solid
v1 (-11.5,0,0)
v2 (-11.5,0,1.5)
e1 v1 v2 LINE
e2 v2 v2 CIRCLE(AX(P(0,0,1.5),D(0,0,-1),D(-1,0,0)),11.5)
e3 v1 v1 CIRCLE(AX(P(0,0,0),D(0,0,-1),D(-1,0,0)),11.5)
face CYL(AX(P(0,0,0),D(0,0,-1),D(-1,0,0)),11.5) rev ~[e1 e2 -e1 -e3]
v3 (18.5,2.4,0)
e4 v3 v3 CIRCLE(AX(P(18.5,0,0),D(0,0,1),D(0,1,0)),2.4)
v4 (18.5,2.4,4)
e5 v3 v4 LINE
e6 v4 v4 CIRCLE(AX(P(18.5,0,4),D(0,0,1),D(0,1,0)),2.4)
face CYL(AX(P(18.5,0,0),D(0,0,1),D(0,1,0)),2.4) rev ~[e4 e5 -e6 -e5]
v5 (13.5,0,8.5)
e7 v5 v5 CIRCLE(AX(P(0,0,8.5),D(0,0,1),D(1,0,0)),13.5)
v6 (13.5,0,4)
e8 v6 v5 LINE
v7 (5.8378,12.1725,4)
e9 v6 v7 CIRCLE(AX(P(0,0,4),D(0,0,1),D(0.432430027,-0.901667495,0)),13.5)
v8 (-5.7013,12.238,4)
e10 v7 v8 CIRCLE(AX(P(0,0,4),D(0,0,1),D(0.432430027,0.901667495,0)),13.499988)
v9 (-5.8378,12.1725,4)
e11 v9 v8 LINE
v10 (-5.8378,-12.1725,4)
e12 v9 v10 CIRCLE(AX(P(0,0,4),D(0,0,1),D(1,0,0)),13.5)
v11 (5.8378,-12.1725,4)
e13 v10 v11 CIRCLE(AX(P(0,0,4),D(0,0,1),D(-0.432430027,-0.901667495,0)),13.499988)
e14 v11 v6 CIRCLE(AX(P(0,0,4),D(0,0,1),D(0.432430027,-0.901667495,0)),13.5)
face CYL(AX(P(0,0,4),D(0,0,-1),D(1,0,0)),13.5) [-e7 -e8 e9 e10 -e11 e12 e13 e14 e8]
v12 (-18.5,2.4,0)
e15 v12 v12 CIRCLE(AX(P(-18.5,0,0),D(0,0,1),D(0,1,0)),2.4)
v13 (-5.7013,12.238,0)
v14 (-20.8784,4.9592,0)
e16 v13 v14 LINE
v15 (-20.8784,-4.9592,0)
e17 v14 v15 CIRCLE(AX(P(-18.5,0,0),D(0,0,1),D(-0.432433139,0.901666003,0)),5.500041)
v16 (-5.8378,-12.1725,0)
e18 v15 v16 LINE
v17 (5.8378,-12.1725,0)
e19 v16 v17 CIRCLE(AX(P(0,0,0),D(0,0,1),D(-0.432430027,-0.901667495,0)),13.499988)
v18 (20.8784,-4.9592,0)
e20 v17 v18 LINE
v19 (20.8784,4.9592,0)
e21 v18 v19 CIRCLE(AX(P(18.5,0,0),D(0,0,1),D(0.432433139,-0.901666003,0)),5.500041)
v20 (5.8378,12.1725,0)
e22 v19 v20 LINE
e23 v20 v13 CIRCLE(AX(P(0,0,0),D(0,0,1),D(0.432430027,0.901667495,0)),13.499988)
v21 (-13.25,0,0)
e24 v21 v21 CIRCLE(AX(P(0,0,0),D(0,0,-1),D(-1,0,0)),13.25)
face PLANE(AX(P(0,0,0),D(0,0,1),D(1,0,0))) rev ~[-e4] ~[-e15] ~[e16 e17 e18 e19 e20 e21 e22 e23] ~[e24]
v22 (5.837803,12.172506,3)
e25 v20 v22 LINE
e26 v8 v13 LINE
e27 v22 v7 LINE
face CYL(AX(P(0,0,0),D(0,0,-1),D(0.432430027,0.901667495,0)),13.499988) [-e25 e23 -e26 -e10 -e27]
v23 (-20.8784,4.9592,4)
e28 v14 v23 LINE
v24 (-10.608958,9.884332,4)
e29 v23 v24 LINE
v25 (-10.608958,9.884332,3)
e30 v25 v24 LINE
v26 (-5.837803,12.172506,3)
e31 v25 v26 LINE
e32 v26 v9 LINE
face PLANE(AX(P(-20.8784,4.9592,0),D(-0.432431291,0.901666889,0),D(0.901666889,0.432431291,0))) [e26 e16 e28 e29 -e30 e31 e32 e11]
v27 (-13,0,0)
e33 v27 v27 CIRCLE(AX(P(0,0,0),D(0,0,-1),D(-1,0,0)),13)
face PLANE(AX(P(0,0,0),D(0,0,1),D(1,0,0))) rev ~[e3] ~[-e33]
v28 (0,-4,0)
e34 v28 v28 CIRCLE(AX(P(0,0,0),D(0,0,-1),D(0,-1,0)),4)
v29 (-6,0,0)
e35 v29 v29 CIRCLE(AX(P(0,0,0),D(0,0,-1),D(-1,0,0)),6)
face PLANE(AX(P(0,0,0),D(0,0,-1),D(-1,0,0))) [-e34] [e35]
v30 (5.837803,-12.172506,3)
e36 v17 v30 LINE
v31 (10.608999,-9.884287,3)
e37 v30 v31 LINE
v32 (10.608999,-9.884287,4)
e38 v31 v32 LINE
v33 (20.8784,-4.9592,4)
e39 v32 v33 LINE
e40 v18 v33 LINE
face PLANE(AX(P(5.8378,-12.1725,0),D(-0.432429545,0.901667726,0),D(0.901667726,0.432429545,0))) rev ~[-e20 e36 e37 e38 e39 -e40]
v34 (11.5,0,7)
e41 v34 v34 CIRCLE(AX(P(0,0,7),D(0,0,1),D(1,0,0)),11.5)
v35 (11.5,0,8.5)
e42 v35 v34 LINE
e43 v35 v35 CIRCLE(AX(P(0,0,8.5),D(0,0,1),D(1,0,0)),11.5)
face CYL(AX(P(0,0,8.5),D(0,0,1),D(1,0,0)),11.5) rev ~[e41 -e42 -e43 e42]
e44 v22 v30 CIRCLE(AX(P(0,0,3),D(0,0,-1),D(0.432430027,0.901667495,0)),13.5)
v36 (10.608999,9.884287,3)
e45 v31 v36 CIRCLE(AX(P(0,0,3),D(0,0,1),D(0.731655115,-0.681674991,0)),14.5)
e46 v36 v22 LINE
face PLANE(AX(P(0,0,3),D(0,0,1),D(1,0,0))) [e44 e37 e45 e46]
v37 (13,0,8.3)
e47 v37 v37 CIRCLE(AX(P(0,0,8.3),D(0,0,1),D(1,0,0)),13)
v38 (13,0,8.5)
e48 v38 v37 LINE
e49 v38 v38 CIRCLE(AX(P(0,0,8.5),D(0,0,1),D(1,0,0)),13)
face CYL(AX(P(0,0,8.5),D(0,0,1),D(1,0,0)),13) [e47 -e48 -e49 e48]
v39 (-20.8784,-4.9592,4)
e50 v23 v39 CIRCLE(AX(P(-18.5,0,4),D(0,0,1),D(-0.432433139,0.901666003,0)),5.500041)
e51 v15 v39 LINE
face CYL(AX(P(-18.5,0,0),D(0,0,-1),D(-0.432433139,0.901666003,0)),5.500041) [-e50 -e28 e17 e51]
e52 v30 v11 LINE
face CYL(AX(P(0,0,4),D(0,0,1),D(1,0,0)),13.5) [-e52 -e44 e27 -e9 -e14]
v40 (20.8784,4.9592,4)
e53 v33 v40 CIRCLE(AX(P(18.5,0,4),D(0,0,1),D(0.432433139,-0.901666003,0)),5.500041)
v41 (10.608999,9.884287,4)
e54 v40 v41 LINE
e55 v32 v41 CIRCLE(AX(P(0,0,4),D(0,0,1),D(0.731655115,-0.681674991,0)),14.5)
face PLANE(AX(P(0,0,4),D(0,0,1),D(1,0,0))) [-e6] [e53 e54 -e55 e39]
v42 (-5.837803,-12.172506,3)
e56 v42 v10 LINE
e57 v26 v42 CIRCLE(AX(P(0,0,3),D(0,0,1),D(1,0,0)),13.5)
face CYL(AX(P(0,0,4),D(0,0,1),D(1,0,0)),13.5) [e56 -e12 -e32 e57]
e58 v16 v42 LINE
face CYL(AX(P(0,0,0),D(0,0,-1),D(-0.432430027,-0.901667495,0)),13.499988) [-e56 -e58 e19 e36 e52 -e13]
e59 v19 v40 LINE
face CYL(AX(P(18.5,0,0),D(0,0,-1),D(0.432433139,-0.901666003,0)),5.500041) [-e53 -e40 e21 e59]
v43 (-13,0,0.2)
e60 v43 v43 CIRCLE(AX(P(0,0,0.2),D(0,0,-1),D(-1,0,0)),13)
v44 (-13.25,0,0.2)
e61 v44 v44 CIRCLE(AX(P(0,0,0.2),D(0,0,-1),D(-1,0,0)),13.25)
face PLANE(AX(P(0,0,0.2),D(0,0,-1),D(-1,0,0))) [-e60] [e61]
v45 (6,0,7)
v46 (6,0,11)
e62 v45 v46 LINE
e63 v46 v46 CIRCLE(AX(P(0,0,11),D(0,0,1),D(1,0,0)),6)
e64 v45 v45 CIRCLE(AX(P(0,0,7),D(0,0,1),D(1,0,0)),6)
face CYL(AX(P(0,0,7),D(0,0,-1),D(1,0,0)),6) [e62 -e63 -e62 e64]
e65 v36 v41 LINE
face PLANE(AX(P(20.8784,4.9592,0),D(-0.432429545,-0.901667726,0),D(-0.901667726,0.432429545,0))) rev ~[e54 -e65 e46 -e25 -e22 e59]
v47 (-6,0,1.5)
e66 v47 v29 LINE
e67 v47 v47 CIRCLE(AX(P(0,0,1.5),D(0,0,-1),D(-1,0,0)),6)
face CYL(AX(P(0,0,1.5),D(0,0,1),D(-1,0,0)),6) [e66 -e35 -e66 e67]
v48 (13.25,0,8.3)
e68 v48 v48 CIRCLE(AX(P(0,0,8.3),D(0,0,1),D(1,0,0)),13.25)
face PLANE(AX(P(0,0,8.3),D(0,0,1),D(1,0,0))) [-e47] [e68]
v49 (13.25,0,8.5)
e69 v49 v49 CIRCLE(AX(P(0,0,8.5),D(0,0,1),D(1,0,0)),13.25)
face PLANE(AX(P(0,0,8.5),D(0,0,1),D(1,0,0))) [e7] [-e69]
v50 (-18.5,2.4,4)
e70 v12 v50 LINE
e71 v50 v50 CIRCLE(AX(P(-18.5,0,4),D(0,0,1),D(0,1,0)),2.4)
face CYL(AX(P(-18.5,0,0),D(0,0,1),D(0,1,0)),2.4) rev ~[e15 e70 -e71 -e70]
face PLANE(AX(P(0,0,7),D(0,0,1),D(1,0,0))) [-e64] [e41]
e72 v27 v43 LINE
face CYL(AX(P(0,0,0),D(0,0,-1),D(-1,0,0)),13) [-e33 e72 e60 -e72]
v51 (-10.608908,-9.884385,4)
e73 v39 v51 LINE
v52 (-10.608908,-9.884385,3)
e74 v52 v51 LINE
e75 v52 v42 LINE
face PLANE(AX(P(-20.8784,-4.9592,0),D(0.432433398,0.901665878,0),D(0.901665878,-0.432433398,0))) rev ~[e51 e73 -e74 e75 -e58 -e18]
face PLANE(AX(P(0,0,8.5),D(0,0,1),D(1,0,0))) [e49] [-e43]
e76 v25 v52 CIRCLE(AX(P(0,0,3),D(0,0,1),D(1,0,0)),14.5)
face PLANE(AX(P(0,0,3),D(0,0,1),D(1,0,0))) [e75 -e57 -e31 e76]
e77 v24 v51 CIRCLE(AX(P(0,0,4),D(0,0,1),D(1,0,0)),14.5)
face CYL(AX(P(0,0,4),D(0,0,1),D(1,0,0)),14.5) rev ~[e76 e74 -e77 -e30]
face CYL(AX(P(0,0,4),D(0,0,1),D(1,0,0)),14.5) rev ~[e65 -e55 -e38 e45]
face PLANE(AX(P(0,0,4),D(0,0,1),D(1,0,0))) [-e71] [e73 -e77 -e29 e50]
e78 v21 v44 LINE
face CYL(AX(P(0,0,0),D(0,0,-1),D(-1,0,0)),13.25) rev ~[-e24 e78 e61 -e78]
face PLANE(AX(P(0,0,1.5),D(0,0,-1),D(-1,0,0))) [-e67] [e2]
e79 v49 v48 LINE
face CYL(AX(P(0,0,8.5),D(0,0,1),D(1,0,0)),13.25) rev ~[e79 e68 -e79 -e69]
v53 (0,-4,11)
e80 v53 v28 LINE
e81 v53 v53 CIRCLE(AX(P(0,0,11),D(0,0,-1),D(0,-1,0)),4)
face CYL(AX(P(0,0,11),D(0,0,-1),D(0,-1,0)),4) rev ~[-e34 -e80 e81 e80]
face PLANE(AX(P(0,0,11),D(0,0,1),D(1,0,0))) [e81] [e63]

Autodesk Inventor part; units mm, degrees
ref_plane "YZ Plane" through (0, 0, 0) normal (1, 0, 0) x (0, 1, 0)
ref_plane "XZ Plane" through (0, 0, 0) normal (0, 1, 0) x (-1, 0, 0)
ref_plane "XY Plane" through (0, 0, 0) normal (0, 0, 1) x (1, 0, 0)
sketch "Esboço1" plane through (0, 0, 0) normal (0, 0, 1) x (1, 0, 0)
  line L0 (-18.5, 0) -> (18.5, 0) construction
  line L1 (-24, 0) -> (24, 0) construction
  line L2 (-20.8784, 4.9592) -> (-5.7013, 12.238)
  line L3 (20.8784, 4.9592) -> (5.8378, 12.1725)
  line L4 (-20.8784, -4.9592) -> (-5.5742, -12.299)
  line L5 (5.8378, -12.1725) -> (20.8784, -4.9592)
  arc A0 (20.8784, -4.9592) -> (20.8784, 4.9592) centre (18.5, 0) ccw
  arc A1 (-5.8378, -12.1725) -> (5.8378, -12.1725) centre (0, 0) ccw
  arc A2 (5.8378, 12.1725) -> (-5.8378, 12.1725) centre (0, 0) ccw
  arc A3 (-20.8784, 4.9592) -> (-20.8784, -4.9592) centre (-18.5, 0) ccw
  dimension "d1" = 37
  dimension "d2" = 48
extrude "Extrusão1" add sketch "Esboço1" along normal blind 4
sketch "Esboço2" plane through (0, 0, 4) normal (0, 0, 1) x (1, 0, 0)
  circle A0 centre (0, 0) radius 13.5
  circle A1 centre (0, 0) radius 14.5
  dimension "d5" = 27
  dimension "d6" = 29
extrude "Extrusão2" cut sketch "Esboço2" against normal blind 1
sketch "Esboço3" plane through (0, 0, 4) normal (0, 0, 1) x (1, 0, 0)
  circle A0 centre (0, 0) radius 13.5
  dimension "d9" = 27
extrude "Extrusão3" add sketch "Esboço3" along normal blind 4.5
sketch "Esboço4" plane through (0, 0, 8.5) normal (0, 0, 1) x (1, 0, 0)
  circle A0 centre (0, 0) radius 11.5
  dimension "d12" = 23
extrude "Extrusão4" cut sketch "Esboço4" against normal blind 1.5
sketch "Esboço5" plane through (0, 0, 0) normal (0, 0, -1) x (-1, 0, 0)
  circle A0 centre (0, 0) radius 11.5
  dimension "d15" = 23
extrude "Extrusão5" cut sketch "Esboço5" against normal blind 1.5
sketch "Esboço6" plane through (0, 0, 8.5) normal (0, 0, 1) x (1, 0, 0)
  circle A0 centre (0, 0) radius 13
  circle A1 centre (0, 0) radius 13.25
  dimension "d18" = 26
  dimension "d19" = 26.5
extrude "Extrusão6" cut sketch "Esboço6" against normal blind 0.2
sketch "Esboço8" plane through (0, 0, 0) normal (0, 0, -1) x (-1, 0, 0)
  circle A0 centre (0, 0) radius 13
  circle A1 centre (0, 0) radius 13.25
  dimension "d22" = 26
  dimension "d23" = 26.5
extrude "Extrusão7" cut sketch "Esboço8" against normal blind 0.2
sketch "Esboço9" plane through (0, 0, 7) normal (0, 0, 1) x (1, 0, 0)
  circle A0 centre (0, 0) radius 6
  dimension "d26" = 12
extrude "Extrusão8" add sketch "Esboço9" along normal blind 4
sketch "Esboço10" plane through (0, 0, 1.5) normal (0, 0, -1) x (-1, 0, 0)
  circle A0 centre (0, 0) radius 6
  dimension "d29" = 12
extrude "Extrusão9" add sketch "Esboço10" along normal blind 1.5
sketch "Esboço11" plane through (0, 0, 11) normal (0, 0, 1) x (1, 0, 0)
  circle A0 centre (0, 0) radius 2.3758
hole "Furo1" at (0, 0, 11) direction (0, 0, -1) diameter 8 end through all
sketch "Esboço12" plane through (0, 0, 0) normal (0, 0, -1) x (-1, 0, 0)
  line L0 (18.5, 0) -> (-18.5, 0) construction
  circle A0 centre (18.5, 0) radius 0.9755 construction
  circle A1 centre (-18.5, 0) radius 0.8896 construction
  point P0 (0, 0)
  point P1 (0, 0)
  dimension "d39" = 37
hole "Furo2" at (-18.5, 0, 0) at (18.5, 0, 0) direction (0, 0, 1) diameter 4.8 end through all
properties part number "KFL08"
